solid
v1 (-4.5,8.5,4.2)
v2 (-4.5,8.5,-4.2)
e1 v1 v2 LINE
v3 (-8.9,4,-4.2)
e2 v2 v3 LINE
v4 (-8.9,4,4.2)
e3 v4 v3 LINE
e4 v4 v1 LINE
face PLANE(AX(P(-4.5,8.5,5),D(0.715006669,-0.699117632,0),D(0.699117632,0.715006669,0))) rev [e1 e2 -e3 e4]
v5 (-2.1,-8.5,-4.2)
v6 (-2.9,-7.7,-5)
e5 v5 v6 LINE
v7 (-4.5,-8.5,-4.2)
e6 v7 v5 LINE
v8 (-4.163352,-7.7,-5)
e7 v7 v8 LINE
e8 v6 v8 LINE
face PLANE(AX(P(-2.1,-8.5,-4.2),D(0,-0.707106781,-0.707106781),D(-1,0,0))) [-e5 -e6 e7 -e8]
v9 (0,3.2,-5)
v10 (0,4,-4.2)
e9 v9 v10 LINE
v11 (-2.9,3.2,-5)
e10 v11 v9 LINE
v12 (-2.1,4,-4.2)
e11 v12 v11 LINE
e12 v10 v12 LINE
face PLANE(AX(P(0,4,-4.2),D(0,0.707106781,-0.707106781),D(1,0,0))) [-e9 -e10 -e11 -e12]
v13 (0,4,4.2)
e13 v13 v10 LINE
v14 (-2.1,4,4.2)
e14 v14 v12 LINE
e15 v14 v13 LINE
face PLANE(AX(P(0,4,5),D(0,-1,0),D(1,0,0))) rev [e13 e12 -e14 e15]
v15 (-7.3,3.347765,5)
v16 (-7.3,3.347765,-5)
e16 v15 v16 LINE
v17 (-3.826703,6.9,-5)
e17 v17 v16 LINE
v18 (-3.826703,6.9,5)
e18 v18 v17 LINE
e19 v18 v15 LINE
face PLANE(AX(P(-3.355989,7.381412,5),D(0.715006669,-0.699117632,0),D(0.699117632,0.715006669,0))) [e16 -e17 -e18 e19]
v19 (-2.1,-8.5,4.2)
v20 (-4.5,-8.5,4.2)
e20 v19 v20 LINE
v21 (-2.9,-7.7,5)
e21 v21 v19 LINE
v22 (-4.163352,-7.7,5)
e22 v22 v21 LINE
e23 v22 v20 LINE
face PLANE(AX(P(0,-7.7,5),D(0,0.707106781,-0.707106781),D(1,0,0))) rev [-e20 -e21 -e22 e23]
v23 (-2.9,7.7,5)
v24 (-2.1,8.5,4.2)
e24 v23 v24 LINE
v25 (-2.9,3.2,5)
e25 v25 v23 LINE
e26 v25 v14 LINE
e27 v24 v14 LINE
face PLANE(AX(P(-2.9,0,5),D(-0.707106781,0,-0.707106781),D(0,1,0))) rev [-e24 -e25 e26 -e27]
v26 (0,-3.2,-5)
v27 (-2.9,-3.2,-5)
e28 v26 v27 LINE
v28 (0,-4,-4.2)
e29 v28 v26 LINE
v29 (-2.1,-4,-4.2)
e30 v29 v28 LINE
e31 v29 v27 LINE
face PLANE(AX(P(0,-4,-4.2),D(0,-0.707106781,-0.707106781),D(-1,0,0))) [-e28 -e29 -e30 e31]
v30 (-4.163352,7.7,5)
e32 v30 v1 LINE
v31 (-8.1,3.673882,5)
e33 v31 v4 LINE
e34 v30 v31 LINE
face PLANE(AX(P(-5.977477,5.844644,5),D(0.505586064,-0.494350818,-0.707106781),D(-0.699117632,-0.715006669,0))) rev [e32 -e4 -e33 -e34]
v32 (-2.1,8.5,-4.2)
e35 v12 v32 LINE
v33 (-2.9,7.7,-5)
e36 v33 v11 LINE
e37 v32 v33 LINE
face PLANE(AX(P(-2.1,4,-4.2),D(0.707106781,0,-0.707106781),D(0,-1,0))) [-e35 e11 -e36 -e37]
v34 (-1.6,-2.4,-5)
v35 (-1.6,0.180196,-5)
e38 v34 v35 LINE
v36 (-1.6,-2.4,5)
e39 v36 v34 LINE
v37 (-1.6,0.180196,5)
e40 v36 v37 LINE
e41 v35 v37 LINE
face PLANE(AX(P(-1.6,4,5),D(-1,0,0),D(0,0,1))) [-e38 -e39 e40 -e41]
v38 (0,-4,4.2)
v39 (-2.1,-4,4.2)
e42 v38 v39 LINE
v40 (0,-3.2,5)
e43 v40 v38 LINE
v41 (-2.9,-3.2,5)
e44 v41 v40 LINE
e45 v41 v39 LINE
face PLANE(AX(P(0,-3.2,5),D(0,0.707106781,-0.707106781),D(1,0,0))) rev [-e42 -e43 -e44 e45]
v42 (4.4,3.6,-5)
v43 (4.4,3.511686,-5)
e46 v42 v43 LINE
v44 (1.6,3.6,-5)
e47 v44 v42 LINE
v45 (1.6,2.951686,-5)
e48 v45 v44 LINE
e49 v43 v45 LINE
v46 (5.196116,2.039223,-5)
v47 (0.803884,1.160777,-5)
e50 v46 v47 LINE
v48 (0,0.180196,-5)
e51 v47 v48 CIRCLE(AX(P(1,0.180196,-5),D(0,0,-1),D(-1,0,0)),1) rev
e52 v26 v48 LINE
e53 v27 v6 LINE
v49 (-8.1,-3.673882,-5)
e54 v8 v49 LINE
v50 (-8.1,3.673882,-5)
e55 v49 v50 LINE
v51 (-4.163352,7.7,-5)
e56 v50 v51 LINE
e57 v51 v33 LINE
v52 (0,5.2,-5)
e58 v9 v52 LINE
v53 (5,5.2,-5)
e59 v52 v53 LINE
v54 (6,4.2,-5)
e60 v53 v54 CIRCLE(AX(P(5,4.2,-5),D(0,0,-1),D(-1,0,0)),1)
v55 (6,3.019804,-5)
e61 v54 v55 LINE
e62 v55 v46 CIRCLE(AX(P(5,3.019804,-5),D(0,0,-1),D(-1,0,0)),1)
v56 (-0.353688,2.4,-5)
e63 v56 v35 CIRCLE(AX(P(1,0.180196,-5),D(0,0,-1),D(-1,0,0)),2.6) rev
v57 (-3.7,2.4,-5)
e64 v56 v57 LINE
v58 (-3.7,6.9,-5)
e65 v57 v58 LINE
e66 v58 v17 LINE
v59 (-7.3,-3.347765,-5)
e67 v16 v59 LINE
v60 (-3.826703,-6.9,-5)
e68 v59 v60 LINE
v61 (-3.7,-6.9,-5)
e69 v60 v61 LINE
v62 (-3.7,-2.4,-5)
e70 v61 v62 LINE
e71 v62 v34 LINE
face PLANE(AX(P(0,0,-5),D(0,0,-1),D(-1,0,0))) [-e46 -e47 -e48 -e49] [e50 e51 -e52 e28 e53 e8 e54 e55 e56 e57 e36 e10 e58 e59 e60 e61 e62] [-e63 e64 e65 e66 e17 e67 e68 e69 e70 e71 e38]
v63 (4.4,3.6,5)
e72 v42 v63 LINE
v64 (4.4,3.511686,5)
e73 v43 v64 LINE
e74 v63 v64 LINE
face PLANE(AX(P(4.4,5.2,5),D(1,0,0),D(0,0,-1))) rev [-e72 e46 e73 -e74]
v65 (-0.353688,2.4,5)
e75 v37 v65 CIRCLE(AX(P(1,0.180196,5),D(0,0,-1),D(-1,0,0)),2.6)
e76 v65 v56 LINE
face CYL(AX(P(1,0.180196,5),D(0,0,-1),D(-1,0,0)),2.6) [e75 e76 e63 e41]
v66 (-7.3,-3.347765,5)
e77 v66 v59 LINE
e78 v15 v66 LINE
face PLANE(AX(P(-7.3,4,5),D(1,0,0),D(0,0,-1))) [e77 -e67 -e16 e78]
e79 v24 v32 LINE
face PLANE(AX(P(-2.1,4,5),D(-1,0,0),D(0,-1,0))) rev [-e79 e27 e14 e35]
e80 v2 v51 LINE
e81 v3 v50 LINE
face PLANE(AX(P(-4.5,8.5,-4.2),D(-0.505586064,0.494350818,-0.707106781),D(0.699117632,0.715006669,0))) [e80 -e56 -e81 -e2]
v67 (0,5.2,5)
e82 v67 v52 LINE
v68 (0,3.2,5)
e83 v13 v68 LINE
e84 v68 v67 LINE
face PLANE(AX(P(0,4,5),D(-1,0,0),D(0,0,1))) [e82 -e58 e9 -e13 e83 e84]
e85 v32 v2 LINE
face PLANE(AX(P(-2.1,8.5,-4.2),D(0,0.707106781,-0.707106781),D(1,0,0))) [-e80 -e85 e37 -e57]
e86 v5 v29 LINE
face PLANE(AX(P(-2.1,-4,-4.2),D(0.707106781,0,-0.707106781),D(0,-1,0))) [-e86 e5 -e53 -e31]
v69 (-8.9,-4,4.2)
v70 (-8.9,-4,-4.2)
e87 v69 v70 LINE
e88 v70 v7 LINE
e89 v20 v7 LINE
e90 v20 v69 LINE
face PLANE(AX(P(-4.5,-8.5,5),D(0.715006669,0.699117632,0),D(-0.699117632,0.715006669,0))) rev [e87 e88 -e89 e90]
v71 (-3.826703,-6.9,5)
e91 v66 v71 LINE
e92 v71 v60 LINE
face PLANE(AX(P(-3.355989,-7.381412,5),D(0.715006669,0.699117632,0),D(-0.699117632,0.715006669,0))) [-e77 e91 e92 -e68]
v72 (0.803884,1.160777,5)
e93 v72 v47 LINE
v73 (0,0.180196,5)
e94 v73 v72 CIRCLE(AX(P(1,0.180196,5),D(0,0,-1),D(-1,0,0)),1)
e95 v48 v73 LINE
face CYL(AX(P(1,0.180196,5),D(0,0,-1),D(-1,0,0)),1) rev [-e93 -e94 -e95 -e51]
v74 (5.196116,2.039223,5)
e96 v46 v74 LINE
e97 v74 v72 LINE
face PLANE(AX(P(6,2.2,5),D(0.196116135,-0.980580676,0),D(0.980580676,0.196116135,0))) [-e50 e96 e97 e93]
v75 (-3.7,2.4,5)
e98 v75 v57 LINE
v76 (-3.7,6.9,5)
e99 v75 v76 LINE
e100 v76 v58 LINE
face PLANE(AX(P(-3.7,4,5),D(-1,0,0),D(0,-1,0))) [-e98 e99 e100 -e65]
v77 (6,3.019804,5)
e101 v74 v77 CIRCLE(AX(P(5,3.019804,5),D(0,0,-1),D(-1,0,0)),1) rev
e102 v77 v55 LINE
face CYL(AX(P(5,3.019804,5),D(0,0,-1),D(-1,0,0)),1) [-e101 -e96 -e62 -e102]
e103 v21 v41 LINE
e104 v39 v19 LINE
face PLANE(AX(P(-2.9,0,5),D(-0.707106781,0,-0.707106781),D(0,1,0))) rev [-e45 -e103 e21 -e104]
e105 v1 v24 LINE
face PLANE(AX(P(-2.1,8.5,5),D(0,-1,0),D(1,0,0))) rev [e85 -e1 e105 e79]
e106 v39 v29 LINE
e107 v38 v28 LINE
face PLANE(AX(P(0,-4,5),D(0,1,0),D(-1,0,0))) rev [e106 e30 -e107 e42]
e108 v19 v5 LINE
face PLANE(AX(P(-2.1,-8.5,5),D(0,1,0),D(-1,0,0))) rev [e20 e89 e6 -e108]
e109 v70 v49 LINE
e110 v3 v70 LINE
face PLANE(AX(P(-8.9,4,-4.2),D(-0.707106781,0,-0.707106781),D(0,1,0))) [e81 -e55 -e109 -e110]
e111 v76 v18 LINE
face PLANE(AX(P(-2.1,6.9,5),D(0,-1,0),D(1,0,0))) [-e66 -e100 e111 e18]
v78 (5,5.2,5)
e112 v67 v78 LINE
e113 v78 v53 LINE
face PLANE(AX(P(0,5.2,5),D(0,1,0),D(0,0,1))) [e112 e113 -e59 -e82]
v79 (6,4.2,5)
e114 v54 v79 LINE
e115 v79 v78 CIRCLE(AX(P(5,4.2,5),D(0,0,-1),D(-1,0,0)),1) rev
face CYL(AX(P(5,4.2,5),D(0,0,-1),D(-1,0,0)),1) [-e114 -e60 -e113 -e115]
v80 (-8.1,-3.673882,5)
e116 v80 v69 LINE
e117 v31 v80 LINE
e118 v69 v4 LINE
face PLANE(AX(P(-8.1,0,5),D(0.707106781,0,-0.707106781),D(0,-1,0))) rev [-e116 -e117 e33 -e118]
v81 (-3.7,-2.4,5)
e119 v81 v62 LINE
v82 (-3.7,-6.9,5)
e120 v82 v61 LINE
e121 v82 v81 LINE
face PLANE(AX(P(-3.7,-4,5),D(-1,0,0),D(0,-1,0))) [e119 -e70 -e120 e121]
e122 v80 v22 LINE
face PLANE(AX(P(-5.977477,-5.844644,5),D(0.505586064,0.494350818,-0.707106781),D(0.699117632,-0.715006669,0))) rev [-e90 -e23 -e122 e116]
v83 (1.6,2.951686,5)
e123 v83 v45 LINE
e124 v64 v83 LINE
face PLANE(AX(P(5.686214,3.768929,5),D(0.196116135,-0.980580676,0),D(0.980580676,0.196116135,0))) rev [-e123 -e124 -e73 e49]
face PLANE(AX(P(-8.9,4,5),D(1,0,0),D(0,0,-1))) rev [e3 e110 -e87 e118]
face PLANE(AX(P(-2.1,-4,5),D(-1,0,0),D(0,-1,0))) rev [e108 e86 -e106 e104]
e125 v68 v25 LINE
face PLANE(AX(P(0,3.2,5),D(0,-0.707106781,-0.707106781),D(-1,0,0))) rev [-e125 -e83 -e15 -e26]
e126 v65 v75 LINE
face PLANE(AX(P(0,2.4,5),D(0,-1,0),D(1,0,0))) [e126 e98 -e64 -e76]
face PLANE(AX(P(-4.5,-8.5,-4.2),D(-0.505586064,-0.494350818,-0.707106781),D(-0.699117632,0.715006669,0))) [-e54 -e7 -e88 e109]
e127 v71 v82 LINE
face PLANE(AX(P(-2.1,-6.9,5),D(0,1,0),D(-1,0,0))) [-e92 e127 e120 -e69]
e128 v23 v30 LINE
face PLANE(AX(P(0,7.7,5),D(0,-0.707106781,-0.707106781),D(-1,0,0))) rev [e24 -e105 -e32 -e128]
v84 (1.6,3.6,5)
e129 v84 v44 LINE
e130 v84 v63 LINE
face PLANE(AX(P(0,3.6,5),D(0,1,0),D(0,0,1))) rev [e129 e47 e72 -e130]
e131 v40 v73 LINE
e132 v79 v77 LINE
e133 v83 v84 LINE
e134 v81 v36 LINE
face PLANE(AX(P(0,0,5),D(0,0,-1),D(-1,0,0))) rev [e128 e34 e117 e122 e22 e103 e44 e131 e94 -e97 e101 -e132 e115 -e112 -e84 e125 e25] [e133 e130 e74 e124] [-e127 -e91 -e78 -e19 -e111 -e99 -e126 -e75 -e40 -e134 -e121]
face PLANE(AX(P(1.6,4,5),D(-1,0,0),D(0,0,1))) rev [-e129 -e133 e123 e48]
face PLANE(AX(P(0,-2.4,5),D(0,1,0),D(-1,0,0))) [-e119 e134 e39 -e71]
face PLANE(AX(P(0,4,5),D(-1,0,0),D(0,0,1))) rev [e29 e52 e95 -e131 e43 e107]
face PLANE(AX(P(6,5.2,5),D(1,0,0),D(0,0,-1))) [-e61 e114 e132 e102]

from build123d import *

# Parameters (mm, degrees)
SALIENTE_EXTRUIR1_DEPTH = 5
SALIENTE_EXTRUIR2_DEPTH = 10
REDONDEO1_R             = 1
VACIADO1_START          = -5
VACIADO1_DEPTH          = 10
CHAFL_N1_SIZE           = 0.8


# Read off the part's stored shape, not the designer's step: Vaciado1
with BuildPart() as part:
    # Croquis1 → Saliente-Extruir1 (new, symmetric)
    with BuildSketch(Plane.XY):
        Polygon((0, 4), (-2.1, 4), (-2.1, 8.5), (-4.5, 8.5), (-8.9, 4), (-8.9, -4), (-4.5, -8.5), (-2.1, -8.5), (-2.1, -4), (0, -4), align=None)
    extrude(amount=SALIENTE_EXTRUIR1_DEPTH, both=True)

    # Croquis2 → Saliente-Extruir2 (add, through all)
    with BuildSketch(Plane(origin=(0, 0, -5), x_dir=(-1, 0, 0), z_dir=(0, 0, -1))):
        Polygon((0, 4), (0, 5.2), (-6, 5.2), (-6, 2.2), (0, 1), align=None)
    extrude(amount=-SALIENTE_EXTRUIR2_DEPTH)

    # Redondeo1
    redondeo1_edges = [part.edges().sort_by_distance(p)[0] for p in [
        (0, 1, 0),
        (6, 2.2, 0),
        (6, 5.2, 0),
    ]]
    fillet(redondeo1_edges, radius=REDONDEO1_R)

    # Vaciado1 outline → Vaciado1 (cut)
    with BuildSketch(Plane.XY.offset(VACIADO1_START)):
        Polygon((4.4, 3.511686244), (4.4, 3.6), (1.6, 3.6), (1.6, 2.951686244), align=None)
        with BuildLine():
            Line((-1.6, -2.4), (-1.6, 0.180196097))
            ThreePointArc((-1.6, 0.180196097), (-1.267111406, 1.453069175), (-0.35368779, 2.4))
            Line((-0.35368779, 2.4), (-3.7, 2.4))
            Line((-3.7, 2.4), (-3.7, 6.9))
            Line((-3.7, 6.9), (-3.826703079, 6.9))
            Line((-3.826703079, 6.9), (-7.3, 3.347764512))
            Line((-7.3, 3.347764512), (-7.3, -3.347764512))
            Line((-7.3, -3.347764512), (-3.826703079, -6.9))
            Line((-3.826703079, -6.9), (-3.7, -6.9))
            Line((-3.7, -6.9), (-3.7, -2.4))
            Line((-3.7, -2.4), (-1.6, -2.4))
        make_face()
    extrude(amount=VACIADO1_DEPTH, mode=Mode.SUBTRACT)

    # Chaflán1
    chafl_n1_edges = [part.edges().sort_by_distance(p)[0] for p in [
        (-1.05, -4, -5),
        (-2.1, -6.25, -5),
        (-3.3, -8.5, -5),
        (-6.7, -6.25, -5),
        (-8.9, 0, -5),
        (-6.7, 6.25, -5),
        (-3.3, 8.5, -5),
        (-2.1, 6.25, 5),
        (-2.1, 6.25, -5),
        (-1.05, 4, -5),
        (-3.3, 8.5, 5),
        (-6.7, 6.25, 5),
        (-8.9, 0, 5),
        (-6.7, -6.25, 5),
        (-3.3, -8.5, 5),
        (-2.1, -6.25, 5),
        (-1.05, -4, 5),
        (-1.05, 4, 5),
    ]]
    chamfer(chafl_n1_edges, length=CHAFL_N1_SIZE)


solid = part.part
